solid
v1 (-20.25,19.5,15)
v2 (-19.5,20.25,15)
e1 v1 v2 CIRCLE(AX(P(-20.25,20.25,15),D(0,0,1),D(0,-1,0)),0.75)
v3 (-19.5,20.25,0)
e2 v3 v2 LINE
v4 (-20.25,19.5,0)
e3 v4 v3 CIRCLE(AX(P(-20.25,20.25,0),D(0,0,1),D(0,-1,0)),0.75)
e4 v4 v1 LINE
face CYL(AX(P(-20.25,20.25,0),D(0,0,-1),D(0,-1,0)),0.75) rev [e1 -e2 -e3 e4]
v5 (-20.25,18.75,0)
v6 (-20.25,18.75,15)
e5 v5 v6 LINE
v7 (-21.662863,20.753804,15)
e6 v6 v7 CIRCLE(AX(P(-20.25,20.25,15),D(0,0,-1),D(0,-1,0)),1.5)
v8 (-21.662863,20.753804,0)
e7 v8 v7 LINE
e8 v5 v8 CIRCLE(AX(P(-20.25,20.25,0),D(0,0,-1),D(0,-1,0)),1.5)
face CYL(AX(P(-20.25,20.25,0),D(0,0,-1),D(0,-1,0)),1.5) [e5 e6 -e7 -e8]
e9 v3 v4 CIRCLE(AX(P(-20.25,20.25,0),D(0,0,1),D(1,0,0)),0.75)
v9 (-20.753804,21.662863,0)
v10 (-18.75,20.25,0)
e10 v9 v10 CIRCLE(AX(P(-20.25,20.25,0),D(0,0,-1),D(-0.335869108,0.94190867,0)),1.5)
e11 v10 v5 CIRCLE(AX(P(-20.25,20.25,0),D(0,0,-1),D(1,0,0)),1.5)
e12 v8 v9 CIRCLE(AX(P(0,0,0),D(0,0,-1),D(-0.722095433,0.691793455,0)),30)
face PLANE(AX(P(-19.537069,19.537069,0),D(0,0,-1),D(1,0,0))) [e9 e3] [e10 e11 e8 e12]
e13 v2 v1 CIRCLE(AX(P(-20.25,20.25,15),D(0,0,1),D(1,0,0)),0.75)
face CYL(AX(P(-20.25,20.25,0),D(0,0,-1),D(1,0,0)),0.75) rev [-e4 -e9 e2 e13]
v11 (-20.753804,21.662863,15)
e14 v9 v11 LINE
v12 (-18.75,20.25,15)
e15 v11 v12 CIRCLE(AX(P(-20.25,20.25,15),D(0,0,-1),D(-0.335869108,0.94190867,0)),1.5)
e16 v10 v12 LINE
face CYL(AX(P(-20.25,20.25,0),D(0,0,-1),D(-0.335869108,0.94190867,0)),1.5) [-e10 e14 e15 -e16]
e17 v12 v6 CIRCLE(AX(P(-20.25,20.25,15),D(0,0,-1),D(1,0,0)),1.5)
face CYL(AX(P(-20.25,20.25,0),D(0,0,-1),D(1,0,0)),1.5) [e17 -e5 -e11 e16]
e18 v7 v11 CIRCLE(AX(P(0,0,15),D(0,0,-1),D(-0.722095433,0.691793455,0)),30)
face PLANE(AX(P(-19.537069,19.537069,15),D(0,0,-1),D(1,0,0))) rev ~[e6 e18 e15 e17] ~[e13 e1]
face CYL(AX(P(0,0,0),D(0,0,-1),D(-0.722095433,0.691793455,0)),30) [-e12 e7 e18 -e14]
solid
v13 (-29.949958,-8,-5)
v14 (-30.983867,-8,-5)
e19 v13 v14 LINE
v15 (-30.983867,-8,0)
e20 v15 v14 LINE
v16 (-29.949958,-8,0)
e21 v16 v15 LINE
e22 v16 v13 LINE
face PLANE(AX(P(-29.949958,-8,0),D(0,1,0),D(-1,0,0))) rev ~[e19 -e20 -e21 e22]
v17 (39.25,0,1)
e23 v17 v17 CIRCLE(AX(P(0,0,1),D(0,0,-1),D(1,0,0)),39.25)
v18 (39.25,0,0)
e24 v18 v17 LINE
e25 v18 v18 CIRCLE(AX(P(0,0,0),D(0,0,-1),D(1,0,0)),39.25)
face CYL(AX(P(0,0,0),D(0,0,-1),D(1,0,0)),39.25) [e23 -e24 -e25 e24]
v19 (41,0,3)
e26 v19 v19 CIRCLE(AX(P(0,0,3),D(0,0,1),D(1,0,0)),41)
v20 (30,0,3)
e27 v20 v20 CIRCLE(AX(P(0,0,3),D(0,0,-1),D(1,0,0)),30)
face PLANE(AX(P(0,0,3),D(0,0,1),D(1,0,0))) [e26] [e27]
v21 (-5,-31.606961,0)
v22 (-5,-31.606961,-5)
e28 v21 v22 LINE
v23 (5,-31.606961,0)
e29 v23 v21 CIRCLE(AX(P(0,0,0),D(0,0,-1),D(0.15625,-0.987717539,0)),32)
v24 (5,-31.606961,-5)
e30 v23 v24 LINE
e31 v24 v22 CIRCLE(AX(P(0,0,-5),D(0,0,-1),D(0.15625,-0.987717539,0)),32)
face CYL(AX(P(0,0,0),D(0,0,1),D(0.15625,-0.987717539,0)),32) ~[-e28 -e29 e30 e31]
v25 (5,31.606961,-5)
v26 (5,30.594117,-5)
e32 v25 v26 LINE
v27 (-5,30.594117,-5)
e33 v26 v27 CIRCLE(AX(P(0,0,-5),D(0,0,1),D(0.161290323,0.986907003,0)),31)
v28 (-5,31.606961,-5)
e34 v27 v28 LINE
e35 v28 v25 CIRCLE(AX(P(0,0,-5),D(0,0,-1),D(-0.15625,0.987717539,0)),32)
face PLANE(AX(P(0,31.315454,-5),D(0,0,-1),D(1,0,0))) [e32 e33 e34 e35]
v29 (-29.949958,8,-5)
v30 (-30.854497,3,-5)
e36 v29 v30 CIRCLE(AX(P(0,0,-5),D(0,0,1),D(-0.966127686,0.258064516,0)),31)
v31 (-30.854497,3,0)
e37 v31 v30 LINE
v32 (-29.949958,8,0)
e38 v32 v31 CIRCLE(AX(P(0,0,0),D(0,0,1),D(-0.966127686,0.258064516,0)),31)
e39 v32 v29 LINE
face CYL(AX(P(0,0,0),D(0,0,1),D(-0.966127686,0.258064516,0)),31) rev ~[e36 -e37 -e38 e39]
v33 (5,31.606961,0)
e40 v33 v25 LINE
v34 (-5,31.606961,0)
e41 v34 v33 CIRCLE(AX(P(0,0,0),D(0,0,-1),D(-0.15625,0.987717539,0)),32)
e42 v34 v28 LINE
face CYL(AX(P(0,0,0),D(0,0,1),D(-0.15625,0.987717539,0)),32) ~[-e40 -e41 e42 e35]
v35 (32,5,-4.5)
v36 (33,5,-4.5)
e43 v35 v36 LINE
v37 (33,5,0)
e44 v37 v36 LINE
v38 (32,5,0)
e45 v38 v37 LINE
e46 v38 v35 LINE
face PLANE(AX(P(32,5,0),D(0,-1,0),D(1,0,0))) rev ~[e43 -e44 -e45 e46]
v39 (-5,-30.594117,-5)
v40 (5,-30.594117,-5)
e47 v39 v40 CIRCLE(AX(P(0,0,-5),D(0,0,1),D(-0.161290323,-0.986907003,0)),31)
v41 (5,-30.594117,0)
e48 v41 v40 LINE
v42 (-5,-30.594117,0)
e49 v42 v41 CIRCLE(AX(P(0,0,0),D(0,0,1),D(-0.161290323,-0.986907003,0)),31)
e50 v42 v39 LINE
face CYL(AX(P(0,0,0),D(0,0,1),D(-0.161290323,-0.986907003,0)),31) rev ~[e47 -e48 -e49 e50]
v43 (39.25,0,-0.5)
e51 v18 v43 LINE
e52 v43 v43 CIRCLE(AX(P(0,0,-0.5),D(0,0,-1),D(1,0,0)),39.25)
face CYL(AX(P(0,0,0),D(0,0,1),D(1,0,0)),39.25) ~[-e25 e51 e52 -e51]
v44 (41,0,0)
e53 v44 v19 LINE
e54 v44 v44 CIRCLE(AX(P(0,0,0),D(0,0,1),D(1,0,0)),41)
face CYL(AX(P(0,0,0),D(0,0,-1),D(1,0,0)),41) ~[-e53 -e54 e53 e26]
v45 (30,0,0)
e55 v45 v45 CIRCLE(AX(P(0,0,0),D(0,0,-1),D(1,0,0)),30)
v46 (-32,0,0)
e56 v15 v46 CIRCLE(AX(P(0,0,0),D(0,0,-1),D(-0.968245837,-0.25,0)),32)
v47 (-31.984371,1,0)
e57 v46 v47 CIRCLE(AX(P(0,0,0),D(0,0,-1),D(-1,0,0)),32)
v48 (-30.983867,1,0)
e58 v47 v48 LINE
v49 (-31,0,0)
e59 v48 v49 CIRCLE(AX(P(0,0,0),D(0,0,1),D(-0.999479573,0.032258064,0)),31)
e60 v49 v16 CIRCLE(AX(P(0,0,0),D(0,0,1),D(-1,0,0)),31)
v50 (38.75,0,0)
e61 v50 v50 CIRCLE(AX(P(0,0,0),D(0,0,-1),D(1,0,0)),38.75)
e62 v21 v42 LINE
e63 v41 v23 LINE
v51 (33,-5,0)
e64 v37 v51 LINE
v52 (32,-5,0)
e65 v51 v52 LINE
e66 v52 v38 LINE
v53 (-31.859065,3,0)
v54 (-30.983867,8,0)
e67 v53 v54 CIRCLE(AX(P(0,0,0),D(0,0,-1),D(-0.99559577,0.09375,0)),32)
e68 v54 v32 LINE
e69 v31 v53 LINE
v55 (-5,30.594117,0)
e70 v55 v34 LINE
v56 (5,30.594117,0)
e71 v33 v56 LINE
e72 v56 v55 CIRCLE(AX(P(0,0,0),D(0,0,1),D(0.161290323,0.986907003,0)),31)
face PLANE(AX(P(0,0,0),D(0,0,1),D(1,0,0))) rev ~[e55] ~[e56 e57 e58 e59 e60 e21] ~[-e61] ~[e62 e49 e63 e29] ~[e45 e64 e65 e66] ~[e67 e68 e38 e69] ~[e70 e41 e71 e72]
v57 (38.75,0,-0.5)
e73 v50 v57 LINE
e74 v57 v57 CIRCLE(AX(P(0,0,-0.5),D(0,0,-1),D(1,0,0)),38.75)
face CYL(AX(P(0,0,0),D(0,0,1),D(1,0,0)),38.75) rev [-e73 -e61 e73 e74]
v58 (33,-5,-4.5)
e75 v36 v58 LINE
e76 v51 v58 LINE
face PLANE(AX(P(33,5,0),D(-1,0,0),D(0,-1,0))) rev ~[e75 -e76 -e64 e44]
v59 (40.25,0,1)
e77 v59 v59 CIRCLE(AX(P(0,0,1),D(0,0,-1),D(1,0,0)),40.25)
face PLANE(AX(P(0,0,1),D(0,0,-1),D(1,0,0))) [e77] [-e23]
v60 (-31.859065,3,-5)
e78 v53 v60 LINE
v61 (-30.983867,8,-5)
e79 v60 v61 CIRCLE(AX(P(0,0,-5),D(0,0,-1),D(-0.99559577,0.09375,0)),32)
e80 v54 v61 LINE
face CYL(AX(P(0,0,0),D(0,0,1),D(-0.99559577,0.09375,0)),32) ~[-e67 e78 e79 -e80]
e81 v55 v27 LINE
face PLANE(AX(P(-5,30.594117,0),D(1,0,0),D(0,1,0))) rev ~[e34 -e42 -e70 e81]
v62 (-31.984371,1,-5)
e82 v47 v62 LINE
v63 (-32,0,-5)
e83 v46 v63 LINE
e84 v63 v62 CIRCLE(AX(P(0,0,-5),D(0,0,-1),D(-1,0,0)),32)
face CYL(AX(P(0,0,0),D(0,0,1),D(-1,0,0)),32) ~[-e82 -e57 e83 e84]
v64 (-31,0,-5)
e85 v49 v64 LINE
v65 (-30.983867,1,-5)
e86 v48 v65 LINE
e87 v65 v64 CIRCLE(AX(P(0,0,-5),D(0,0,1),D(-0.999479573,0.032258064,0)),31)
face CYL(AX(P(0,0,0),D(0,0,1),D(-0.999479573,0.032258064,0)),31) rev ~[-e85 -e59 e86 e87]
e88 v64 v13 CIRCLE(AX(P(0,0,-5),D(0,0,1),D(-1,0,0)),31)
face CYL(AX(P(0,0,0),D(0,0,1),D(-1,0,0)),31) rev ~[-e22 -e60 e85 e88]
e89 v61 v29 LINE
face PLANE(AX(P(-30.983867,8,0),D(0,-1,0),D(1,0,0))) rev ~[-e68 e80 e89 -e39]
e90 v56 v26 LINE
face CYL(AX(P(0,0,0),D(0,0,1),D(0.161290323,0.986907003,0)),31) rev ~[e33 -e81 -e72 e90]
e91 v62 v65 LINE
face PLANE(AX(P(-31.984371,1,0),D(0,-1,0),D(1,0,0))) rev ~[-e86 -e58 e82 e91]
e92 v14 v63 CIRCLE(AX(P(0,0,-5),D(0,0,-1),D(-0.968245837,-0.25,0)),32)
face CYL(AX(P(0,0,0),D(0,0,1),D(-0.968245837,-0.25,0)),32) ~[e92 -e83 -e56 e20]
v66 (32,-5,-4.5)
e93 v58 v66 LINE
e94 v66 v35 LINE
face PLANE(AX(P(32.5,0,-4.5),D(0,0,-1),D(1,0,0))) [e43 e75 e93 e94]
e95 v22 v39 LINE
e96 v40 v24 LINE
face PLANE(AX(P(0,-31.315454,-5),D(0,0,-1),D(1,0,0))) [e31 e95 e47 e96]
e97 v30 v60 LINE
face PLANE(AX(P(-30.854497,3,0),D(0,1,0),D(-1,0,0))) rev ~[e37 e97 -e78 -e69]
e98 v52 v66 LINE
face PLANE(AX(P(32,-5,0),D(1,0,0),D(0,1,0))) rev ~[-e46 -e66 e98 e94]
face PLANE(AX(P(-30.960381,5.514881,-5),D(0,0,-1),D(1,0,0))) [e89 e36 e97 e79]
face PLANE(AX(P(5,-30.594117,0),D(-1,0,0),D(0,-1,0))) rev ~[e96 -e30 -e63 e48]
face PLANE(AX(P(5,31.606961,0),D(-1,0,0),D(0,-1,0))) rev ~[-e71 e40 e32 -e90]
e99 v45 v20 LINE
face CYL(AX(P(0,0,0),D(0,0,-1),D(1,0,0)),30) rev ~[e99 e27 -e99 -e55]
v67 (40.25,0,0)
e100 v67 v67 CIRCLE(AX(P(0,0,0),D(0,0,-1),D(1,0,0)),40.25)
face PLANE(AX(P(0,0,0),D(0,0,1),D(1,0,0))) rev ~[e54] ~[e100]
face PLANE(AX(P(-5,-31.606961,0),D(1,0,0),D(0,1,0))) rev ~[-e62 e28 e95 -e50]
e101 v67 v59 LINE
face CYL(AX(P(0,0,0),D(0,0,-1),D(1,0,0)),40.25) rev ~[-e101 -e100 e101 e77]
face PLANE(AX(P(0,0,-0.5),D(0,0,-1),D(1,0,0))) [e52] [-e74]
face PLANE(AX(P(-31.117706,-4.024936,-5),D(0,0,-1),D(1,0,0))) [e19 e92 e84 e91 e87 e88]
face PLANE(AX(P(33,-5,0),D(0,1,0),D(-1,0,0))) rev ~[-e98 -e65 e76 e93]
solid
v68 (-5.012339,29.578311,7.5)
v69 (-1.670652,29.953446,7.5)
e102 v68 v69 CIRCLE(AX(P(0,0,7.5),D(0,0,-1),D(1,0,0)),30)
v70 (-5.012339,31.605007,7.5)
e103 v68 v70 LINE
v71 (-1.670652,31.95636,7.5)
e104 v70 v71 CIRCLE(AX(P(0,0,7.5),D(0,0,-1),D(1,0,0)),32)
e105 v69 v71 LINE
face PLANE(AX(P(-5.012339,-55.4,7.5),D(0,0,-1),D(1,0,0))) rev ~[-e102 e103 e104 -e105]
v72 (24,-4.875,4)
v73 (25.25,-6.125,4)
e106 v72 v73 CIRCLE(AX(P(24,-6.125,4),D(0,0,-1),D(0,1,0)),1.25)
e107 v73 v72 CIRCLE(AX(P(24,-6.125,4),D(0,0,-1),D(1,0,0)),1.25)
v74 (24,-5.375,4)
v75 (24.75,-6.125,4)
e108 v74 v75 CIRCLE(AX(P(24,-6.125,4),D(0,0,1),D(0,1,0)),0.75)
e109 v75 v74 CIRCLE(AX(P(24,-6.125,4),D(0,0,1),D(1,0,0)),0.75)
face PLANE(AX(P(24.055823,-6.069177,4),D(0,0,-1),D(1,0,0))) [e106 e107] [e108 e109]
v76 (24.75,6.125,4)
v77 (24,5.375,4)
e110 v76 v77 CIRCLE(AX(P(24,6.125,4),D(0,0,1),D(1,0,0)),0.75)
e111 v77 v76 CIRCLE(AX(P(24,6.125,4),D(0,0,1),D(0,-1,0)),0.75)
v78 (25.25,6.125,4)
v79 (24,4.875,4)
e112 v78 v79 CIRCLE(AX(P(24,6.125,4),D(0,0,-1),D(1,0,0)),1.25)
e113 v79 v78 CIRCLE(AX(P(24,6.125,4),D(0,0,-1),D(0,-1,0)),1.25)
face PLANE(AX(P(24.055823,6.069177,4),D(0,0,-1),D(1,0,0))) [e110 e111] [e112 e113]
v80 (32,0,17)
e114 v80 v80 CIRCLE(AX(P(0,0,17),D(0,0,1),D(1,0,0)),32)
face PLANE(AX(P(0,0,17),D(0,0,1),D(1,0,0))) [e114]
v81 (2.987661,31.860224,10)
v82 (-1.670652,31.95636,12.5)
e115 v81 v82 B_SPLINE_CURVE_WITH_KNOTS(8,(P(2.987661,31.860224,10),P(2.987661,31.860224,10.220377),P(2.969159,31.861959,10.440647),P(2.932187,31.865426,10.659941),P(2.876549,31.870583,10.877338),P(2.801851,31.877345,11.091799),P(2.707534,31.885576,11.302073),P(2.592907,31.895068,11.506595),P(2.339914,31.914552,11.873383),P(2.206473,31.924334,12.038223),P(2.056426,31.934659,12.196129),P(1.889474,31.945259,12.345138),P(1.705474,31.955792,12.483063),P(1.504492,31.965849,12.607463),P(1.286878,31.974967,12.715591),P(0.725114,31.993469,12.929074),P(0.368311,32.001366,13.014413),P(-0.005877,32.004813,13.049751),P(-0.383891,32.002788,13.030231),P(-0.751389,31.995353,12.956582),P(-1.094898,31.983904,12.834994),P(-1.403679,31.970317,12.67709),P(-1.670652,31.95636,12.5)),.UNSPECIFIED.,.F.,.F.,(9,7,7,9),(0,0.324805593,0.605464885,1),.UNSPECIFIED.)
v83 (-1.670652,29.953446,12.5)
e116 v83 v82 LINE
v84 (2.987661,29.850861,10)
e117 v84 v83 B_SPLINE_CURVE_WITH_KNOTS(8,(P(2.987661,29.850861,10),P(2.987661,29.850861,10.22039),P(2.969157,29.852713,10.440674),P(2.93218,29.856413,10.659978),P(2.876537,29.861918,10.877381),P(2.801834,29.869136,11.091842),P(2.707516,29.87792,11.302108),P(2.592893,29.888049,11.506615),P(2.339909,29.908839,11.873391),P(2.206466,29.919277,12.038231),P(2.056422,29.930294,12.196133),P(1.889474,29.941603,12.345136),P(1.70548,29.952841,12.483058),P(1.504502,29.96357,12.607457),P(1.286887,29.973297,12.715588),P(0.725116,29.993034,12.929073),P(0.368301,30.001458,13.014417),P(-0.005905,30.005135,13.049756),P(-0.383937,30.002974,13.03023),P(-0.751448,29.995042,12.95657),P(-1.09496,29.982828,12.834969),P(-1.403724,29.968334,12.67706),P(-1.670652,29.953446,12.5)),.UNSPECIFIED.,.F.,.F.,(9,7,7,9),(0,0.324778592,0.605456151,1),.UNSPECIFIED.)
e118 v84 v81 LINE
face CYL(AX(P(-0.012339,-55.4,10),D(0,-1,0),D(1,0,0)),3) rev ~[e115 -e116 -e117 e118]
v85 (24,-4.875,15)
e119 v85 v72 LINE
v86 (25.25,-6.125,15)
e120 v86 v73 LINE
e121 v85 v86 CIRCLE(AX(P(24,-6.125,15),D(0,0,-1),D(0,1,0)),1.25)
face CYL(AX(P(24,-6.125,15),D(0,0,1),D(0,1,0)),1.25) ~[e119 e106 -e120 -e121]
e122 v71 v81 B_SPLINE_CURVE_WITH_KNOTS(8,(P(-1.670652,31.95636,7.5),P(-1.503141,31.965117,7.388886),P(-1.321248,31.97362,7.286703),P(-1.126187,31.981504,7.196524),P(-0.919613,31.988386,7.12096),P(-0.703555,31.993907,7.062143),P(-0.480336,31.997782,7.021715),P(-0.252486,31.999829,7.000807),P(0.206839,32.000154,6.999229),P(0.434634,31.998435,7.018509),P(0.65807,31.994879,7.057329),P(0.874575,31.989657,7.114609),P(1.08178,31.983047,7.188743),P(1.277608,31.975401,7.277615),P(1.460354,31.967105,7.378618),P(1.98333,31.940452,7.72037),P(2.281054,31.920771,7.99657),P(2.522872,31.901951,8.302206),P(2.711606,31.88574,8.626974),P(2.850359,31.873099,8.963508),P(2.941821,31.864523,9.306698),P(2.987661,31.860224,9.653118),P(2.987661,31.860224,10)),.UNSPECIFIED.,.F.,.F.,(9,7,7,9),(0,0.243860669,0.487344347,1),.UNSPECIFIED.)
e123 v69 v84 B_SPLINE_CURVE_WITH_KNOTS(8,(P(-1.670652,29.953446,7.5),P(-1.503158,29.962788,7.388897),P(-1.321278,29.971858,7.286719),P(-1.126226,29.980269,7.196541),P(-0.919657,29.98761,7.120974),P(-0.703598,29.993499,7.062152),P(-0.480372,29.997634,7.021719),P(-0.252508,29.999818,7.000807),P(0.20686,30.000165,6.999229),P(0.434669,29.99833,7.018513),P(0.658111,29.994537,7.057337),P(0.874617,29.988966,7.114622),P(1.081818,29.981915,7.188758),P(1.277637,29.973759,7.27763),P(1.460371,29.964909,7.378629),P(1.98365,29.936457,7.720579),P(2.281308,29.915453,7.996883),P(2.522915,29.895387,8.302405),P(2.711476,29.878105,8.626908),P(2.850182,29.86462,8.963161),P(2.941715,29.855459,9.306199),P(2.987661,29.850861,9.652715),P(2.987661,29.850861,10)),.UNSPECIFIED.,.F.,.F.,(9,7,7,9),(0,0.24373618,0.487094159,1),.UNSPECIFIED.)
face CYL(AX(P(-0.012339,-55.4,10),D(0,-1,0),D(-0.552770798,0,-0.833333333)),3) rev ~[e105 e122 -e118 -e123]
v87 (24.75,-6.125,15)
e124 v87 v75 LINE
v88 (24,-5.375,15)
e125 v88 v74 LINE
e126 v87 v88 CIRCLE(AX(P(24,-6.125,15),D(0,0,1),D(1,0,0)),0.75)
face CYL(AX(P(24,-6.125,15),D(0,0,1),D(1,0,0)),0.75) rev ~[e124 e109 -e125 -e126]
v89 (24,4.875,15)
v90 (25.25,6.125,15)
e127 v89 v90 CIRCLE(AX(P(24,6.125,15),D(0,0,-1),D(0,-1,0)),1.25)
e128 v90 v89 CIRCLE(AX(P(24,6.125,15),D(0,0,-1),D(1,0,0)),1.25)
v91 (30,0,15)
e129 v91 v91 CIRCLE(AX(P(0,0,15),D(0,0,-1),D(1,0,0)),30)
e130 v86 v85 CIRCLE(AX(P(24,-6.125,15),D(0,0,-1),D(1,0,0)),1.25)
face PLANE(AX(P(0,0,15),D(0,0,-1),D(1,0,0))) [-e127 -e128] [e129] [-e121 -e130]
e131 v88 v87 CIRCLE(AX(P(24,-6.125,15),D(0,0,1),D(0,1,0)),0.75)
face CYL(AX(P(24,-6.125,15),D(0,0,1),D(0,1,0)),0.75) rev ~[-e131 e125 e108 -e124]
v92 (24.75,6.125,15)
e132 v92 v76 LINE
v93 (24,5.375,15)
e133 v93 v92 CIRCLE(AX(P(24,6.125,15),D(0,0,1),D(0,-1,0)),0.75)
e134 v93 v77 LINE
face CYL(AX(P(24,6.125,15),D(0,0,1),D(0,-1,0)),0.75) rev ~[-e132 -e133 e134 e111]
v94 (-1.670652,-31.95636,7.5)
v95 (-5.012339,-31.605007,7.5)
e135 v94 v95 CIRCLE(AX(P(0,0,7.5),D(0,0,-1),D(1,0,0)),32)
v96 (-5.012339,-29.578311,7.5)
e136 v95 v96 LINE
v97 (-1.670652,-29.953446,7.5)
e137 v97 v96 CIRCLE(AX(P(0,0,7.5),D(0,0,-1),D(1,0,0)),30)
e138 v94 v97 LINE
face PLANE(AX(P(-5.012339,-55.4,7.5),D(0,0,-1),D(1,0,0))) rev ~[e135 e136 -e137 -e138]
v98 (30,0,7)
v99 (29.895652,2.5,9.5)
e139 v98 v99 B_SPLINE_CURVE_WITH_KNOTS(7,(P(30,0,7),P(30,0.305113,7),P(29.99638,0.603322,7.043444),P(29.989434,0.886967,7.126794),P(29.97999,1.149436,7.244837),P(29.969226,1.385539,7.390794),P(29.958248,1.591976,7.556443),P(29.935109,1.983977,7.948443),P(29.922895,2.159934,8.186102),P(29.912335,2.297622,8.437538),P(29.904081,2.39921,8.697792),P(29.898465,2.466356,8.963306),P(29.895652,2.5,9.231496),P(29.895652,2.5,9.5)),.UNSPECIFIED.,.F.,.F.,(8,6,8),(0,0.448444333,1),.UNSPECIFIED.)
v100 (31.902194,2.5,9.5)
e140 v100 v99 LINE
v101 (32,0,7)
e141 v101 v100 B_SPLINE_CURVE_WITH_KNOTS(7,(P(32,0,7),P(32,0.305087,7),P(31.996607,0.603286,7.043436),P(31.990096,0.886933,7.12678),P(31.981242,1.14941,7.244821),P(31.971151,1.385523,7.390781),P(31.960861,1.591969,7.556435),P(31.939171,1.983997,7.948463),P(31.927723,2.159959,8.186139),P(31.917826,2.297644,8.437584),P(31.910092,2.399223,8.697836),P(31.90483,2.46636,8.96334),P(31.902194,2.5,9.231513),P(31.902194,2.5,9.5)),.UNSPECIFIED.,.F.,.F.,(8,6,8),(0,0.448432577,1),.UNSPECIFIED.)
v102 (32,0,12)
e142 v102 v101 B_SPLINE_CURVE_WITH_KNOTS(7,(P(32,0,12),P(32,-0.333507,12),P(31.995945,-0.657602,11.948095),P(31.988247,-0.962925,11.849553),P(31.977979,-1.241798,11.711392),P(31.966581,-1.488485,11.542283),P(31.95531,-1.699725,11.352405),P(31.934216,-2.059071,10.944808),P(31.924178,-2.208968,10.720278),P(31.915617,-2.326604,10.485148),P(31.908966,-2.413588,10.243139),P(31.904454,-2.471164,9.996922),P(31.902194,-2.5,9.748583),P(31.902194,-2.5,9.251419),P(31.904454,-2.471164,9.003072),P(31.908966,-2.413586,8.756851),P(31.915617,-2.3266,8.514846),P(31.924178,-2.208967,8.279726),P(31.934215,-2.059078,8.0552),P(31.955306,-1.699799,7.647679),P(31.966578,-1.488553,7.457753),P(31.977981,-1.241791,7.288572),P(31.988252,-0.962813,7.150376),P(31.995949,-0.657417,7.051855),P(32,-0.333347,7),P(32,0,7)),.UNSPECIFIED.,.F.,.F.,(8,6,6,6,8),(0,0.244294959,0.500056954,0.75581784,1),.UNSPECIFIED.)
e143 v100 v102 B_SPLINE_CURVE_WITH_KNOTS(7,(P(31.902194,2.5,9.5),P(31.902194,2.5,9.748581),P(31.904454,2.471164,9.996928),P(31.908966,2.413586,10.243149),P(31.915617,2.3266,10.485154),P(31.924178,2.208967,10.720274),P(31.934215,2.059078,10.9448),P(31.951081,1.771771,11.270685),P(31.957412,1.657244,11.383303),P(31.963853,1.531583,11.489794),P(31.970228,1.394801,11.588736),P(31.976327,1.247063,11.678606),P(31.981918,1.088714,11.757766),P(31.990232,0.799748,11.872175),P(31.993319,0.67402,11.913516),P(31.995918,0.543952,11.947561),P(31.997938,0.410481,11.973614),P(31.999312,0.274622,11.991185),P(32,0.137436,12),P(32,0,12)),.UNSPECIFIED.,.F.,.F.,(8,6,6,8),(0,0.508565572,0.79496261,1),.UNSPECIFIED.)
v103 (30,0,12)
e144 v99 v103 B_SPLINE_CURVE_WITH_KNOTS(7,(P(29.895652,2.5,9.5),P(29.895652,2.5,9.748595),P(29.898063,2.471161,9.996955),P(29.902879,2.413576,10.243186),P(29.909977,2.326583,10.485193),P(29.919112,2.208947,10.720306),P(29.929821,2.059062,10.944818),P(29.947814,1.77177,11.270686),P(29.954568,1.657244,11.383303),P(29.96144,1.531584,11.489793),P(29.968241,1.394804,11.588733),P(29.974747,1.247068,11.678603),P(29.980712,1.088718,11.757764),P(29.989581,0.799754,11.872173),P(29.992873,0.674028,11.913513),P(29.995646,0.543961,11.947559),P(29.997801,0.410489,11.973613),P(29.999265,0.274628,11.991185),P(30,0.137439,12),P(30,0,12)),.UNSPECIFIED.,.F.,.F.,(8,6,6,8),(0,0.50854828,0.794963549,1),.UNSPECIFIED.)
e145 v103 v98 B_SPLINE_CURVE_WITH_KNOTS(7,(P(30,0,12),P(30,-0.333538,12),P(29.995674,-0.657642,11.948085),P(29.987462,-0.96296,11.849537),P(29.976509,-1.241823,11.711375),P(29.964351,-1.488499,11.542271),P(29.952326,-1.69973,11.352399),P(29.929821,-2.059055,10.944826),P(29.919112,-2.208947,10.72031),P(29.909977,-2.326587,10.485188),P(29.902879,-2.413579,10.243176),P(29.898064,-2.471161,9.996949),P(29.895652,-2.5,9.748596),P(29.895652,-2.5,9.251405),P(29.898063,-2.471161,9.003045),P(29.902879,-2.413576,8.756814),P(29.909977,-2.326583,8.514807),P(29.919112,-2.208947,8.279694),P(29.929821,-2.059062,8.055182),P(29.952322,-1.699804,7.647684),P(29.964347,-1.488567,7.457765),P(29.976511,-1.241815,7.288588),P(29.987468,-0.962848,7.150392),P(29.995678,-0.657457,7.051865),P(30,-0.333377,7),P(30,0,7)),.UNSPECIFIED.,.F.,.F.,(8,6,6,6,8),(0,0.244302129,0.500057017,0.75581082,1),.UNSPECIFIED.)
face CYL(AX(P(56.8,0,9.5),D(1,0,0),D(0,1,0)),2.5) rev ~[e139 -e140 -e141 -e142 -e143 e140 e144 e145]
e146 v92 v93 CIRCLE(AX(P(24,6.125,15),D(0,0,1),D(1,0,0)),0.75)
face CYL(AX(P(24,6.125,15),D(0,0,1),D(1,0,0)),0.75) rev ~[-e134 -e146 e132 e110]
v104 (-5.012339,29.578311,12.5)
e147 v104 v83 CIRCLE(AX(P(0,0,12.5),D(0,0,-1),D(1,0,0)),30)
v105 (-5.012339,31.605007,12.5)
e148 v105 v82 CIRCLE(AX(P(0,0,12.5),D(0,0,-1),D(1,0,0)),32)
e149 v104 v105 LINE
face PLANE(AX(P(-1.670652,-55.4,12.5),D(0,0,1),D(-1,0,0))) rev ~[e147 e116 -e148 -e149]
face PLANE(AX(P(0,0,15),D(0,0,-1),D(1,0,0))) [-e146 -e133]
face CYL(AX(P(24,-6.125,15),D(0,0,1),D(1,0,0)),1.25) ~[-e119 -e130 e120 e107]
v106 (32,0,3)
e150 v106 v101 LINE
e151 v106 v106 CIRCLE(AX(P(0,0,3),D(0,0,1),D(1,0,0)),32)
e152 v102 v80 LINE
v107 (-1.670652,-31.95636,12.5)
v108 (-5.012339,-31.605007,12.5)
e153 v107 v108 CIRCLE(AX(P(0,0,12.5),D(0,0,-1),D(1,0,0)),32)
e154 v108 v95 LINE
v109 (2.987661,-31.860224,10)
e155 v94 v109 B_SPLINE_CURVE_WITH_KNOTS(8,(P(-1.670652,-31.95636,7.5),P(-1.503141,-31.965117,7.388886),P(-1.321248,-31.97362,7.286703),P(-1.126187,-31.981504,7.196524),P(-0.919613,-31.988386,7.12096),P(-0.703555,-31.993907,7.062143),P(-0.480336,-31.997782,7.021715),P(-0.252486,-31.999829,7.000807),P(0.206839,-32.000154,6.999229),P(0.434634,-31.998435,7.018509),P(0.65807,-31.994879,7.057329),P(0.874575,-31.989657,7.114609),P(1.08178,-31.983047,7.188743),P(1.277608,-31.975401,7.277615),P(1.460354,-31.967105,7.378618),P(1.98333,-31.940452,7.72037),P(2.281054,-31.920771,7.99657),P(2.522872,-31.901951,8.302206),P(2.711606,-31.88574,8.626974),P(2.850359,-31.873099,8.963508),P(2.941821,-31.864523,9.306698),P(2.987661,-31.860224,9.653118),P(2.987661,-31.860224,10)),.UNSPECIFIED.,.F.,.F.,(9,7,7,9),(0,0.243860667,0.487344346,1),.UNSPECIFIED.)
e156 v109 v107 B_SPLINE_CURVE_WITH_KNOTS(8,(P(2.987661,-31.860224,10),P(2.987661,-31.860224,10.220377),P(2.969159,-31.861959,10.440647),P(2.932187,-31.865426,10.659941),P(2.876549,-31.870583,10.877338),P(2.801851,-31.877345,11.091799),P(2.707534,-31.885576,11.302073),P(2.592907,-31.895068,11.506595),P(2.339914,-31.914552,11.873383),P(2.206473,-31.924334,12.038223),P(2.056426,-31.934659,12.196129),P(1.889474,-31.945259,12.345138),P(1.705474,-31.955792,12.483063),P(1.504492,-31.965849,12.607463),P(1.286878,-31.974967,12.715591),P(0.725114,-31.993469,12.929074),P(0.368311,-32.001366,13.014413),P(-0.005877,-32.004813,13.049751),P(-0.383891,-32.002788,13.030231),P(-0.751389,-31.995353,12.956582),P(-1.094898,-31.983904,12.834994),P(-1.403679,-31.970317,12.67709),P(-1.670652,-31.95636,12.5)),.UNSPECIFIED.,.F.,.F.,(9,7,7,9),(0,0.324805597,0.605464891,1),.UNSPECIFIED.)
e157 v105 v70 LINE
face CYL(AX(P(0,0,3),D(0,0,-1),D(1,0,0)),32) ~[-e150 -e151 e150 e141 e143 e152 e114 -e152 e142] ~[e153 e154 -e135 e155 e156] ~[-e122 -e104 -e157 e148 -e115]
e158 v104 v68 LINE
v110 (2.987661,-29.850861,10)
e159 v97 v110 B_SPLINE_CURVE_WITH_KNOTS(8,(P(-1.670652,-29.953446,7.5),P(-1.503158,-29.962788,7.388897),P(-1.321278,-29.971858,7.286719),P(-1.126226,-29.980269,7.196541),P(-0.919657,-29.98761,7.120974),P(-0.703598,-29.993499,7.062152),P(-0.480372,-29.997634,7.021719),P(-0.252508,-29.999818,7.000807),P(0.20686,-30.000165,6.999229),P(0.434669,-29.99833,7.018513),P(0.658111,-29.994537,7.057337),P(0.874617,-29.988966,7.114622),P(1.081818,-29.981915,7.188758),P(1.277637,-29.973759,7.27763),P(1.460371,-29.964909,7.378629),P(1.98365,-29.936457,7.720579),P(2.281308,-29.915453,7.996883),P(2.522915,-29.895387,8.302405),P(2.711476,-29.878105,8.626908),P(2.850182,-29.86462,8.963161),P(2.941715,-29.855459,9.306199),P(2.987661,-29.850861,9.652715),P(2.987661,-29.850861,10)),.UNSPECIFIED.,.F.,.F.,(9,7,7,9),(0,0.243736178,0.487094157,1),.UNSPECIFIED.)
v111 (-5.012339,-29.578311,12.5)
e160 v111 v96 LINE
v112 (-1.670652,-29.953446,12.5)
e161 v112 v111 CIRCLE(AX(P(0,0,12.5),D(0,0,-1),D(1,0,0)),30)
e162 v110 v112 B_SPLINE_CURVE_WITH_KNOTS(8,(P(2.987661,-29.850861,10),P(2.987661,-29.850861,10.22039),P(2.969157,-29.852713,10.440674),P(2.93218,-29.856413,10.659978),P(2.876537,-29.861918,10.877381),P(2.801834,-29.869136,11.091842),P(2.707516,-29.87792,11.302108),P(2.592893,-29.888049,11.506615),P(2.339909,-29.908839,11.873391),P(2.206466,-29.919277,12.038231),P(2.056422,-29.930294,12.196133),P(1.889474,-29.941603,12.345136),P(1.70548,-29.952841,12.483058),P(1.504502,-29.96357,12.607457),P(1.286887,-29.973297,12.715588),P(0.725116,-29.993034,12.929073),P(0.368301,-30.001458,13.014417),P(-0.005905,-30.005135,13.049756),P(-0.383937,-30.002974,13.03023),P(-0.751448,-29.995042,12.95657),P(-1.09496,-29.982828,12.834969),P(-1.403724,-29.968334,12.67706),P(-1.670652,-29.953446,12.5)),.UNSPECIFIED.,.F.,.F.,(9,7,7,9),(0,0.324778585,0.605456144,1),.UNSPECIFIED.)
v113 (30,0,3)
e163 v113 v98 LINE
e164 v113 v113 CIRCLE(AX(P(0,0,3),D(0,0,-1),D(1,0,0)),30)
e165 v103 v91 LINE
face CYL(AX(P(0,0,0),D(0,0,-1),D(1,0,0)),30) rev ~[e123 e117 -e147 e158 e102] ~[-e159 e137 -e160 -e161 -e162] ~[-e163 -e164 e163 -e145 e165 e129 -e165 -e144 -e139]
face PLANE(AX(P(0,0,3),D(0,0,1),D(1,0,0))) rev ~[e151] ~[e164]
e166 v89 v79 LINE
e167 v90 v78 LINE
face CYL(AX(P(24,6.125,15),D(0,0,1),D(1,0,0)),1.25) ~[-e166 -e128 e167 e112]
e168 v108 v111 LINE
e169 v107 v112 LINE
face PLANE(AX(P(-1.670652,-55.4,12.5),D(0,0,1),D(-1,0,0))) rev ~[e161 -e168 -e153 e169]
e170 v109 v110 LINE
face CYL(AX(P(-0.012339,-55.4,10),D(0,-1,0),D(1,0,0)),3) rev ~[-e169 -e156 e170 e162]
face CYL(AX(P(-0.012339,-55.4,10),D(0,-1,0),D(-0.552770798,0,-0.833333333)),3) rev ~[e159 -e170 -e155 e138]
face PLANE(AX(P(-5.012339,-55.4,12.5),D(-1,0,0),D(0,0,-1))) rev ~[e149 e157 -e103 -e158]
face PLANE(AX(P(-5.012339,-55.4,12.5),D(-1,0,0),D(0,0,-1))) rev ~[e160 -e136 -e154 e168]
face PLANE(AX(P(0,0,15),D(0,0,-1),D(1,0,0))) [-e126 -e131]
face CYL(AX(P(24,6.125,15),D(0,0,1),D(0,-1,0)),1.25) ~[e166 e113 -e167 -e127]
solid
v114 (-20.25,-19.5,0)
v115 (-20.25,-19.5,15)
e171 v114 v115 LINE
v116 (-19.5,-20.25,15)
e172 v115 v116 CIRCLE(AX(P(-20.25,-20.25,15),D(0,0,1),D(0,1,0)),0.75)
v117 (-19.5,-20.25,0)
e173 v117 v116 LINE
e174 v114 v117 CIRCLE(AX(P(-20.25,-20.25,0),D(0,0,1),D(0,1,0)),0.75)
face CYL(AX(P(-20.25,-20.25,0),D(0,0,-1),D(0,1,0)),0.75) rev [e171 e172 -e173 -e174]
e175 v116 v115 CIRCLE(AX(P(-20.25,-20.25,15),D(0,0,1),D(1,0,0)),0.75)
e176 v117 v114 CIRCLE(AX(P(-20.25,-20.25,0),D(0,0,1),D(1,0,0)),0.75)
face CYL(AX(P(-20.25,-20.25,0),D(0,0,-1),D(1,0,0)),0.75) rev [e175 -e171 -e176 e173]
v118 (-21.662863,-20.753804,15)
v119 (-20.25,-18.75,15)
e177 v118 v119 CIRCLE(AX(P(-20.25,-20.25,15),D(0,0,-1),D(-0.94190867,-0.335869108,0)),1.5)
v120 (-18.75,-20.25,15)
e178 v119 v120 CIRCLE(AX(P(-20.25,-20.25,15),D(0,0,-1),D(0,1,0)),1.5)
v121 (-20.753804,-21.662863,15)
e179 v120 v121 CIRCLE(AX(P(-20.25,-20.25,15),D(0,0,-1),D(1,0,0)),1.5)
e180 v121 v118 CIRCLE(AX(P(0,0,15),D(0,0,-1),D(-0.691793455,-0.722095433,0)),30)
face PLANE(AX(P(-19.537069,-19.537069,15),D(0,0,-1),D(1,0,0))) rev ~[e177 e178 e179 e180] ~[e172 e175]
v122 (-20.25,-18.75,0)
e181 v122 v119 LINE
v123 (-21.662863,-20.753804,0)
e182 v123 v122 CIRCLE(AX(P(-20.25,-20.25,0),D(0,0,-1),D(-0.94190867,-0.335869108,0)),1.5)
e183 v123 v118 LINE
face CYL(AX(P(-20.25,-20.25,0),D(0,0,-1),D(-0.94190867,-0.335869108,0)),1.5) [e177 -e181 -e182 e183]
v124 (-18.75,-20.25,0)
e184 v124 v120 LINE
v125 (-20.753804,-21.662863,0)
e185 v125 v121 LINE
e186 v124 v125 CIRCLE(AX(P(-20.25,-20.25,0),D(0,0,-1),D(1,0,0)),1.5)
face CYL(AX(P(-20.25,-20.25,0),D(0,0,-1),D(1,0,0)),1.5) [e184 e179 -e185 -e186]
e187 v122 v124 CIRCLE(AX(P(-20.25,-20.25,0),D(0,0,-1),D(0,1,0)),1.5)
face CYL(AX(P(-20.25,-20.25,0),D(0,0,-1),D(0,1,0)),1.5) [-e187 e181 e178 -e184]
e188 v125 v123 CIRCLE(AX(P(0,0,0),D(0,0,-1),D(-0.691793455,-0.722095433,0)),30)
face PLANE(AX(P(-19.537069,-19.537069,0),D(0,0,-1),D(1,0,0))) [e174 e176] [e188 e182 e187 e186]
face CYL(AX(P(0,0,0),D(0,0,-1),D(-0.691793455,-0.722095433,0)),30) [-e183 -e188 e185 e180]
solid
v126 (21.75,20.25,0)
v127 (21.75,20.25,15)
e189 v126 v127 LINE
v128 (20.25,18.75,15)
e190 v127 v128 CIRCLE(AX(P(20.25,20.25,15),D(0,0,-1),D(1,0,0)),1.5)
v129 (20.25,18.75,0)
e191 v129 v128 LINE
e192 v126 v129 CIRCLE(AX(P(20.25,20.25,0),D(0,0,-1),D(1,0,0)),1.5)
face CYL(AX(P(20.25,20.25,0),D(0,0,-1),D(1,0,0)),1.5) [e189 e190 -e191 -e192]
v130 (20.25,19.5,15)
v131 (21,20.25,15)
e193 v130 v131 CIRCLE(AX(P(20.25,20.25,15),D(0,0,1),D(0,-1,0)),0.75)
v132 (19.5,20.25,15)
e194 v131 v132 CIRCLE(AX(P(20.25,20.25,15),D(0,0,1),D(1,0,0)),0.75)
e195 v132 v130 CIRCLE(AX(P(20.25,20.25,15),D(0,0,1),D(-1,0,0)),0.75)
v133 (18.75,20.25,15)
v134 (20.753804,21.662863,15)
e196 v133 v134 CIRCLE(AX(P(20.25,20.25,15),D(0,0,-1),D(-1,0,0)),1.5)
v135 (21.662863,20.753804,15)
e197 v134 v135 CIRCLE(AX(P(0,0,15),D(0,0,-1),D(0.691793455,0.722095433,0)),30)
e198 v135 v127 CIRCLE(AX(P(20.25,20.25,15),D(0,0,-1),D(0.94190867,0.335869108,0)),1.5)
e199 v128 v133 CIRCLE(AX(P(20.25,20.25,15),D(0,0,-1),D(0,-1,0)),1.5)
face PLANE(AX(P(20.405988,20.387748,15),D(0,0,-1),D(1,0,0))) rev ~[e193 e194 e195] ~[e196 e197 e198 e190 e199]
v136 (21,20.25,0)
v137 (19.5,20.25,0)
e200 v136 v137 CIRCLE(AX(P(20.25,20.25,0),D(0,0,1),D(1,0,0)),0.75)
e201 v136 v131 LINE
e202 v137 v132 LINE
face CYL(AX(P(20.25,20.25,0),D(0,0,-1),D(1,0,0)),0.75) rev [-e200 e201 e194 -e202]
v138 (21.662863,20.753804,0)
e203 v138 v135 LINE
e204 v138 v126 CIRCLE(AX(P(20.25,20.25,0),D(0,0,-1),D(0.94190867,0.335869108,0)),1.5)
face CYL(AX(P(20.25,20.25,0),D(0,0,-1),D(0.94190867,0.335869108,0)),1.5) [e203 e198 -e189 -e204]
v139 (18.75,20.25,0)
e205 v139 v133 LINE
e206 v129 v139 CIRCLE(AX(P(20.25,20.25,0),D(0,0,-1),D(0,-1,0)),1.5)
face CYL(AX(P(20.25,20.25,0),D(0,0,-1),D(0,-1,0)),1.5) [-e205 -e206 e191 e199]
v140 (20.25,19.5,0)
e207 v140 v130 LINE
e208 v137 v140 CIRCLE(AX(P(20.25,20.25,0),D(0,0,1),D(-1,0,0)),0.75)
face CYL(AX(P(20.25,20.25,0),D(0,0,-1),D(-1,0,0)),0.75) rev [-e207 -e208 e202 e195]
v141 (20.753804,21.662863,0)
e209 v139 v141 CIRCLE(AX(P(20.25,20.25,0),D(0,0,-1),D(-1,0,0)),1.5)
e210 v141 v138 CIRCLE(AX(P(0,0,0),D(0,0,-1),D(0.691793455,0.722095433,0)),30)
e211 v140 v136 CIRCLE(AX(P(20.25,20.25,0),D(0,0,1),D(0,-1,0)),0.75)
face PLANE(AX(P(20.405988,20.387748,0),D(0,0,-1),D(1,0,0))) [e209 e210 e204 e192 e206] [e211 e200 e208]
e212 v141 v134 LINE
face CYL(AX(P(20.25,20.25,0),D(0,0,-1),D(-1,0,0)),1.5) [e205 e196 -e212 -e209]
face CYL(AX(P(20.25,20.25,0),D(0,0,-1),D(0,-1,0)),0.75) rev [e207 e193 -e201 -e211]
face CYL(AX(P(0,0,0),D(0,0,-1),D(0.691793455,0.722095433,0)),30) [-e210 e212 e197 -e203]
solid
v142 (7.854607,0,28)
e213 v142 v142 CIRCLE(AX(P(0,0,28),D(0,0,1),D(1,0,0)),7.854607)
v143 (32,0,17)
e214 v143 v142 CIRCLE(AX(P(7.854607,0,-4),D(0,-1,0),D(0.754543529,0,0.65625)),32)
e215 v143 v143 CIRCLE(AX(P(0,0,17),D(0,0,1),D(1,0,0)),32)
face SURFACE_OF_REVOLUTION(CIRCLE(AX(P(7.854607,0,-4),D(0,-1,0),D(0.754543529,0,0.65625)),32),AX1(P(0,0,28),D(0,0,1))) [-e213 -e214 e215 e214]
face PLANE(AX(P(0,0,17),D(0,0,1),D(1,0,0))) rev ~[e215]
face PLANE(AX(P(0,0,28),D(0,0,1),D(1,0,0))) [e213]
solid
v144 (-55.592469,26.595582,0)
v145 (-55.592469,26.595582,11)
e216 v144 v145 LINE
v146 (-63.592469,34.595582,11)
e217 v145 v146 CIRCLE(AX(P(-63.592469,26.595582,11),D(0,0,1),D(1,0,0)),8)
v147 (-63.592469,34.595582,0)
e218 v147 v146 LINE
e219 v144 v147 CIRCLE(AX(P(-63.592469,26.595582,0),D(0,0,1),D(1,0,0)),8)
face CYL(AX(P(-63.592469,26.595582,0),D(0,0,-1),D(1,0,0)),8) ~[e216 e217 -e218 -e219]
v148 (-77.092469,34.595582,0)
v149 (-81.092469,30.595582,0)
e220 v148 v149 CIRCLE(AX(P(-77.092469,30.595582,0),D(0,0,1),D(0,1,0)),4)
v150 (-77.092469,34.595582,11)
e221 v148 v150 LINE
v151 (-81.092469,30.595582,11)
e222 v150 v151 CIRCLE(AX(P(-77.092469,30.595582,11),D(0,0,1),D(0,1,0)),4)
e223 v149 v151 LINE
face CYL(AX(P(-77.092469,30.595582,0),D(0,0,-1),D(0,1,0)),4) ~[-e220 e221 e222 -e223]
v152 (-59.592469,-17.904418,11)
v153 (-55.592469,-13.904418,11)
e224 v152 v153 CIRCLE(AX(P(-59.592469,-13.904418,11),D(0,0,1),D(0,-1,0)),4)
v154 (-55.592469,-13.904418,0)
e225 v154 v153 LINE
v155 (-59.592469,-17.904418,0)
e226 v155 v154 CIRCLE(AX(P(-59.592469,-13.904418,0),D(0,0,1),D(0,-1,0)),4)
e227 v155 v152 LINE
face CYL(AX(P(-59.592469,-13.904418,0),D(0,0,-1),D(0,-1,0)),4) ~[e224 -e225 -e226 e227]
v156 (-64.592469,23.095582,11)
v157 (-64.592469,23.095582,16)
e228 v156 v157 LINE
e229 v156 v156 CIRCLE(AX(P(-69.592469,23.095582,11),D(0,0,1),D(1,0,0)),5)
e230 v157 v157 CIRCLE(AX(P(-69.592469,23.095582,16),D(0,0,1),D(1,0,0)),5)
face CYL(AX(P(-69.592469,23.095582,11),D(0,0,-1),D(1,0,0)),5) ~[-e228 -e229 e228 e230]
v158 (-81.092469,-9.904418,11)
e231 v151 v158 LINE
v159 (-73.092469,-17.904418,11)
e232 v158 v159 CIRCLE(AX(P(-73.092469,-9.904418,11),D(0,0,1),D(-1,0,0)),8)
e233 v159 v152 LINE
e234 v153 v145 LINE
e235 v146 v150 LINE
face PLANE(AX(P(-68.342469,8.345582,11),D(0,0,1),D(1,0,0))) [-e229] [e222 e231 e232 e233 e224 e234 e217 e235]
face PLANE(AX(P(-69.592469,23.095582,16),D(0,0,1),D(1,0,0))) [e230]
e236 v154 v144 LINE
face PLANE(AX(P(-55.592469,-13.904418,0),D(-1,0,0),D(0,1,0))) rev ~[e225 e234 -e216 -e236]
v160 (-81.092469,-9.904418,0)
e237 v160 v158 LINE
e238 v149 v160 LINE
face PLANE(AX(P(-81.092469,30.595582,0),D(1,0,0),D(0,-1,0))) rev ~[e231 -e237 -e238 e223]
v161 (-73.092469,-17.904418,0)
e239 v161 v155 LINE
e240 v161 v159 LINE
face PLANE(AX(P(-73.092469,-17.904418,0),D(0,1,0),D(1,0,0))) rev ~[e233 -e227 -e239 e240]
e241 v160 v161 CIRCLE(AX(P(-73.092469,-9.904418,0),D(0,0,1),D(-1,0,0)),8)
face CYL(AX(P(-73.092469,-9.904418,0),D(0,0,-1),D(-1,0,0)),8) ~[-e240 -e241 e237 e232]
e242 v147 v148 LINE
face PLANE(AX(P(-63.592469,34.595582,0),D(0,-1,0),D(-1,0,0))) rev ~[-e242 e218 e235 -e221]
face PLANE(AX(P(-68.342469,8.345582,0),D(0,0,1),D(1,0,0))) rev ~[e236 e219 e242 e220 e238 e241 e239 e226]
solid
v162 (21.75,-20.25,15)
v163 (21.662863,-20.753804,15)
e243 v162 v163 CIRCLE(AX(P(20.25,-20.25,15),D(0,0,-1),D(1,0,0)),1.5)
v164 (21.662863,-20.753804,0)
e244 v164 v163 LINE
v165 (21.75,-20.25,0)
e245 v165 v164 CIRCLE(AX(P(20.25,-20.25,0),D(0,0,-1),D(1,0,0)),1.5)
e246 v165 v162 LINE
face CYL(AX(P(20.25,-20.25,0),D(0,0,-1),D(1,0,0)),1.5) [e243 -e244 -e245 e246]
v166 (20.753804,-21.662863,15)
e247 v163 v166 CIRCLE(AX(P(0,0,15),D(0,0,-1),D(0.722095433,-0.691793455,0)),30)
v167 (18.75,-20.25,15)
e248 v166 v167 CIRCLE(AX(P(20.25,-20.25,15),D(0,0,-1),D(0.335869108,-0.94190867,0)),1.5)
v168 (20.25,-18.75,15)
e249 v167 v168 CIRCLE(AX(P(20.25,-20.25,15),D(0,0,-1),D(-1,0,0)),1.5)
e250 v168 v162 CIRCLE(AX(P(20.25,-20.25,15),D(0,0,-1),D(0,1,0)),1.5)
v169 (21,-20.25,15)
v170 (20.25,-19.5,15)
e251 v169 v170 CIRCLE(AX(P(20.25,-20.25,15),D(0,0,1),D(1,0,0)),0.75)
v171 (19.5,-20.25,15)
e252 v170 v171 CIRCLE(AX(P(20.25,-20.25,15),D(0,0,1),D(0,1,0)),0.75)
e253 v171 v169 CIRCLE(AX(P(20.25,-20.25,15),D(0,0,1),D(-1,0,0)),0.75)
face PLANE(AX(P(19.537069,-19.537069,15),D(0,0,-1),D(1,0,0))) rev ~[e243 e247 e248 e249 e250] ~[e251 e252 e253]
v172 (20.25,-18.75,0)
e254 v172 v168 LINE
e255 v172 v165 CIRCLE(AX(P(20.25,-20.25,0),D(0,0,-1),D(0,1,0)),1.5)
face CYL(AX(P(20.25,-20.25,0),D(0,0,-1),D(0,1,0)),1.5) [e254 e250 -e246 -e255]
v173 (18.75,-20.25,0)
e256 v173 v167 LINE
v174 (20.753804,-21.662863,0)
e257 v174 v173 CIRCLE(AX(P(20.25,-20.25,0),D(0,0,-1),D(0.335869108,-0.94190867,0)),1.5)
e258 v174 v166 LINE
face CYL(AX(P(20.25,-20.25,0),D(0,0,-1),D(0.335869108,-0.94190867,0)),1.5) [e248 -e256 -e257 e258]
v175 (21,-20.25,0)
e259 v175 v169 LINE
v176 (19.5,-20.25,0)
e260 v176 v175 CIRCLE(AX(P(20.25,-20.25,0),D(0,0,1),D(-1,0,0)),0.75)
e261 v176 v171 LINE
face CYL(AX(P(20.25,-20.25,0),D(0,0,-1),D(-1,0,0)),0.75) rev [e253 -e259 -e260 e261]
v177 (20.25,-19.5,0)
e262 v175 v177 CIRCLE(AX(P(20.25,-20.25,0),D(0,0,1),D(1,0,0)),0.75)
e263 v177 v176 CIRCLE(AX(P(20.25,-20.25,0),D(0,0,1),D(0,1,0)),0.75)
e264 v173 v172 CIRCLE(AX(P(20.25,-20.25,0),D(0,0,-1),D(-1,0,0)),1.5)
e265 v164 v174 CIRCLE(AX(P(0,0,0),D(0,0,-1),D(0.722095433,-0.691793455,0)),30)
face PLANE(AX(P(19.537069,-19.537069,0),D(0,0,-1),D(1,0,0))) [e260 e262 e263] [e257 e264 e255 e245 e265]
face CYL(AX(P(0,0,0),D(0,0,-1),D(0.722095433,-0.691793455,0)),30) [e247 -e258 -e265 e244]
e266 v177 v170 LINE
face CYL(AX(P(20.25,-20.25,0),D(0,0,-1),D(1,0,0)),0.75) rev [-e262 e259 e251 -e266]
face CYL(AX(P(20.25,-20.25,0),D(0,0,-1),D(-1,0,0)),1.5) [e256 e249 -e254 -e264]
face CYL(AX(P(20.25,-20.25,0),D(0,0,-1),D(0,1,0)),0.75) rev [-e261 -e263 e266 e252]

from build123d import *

# Parameters (mm, degrees)
F0_R      = 41
F1_DEPTH  = 3
F2_R      = 32
F3_DEPTH  = 14
F4_R      = 32
F5_DEPTH  = 11
F9_DEPTH  = 120.3
F11_R     = 2.5
F12_DEPTH = 58.4
F13_R     = 40.25
F13_R_2   = 39.25
F14_DEPTH = 1
F15_R     = 39.25
F15_R_2   = 38.75
F16_DEPTH = 0.5
F17_R     = 30
F18_DEPTH = 15
F20_DEPTH = 4.5
F22_DEPTH = 11
F24_DEPTH = 15
F26_DEPTH = 5
F28_DEPTH = 11
F29_R     = 5
F30_DEPTH = 5


# Not quite as in the source:
# - a fillet or chamfer that OpenCascade refuses, or shapes differently, is made with other operations: its cross-section is extruded or revolved along the edge and cut away or added


with BuildPart() as f1:
    # F0 (on Top) → F1 (new body)
    with BuildSketch(Plane.XY):
        Circle(F0_R)
    extrude(amount=F1_DEPTH)

    # F13 (on face) → F14 (cut)
    with BuildSketch(Plane(origin=(0, 0, 0), x_dir=(1, 0, 0), z_dir=(0, 0, -1))):
        Circle(F13_R)
        Circle(F13_R_2, mode=Mode.SUBTRACT)
    extrude(amount=-F14_DEPTH, mode=Mode.SUBTRACT)

    # F15 (on face) → F16 (join)
    with BuildSketch(Plane(origin=(0, 0, 0), x_dir=(1, 0, 0), z_dir=(0, 0, -1))):
        Circle(F15_R)
        Circle(F15_R_2, mode=Mode.SUBTRACT)
    extrude(amount=F16_DEPTH)


with BuildPart() as f3:
    # F2 (on face) → F3 (new body)
    with BuildSketch(Plane.XY.offset(3)):
        Circle(F2_R)
    extrude(amount=F3_DEPTH)

    # F8 (on offset) → F9 (cut)
    with BuildSketch(Plane.XZ.offset(55.4)):
        with BuildLine():
            ThreePointArc((-1.6706518419, 7.5), (1.4062977188, 7.3566179631), (2.9876605533, 10))
            ThreePointArc((2.9876605533, 10), (1.4062977188, 12.6433820369), (-1.6706518419, 12.5))
            ThreePointArc((-1.6706518419, 12.5), (-3.0123394467, 10), (-1.6706518419, 7.5))
        make_face()
        with BuildLine():
            ThreePointArc((-1.6706518419, 7.5), (-3.0123394467, 10), (-1.6706518419, 12.5))
            Line((-1.6706518419, 12.5), (-5.0123394467, 12.5))
            Line((-5.0123394467, 12.5), (-5.0123394467, 10))
            Line((-5.0123394467, 10), (-5.0123394467, 7.5))
            Line((-5.0123394467, 7.5), (-1.6706518419, 7.5))
        make_face()
    extrude(amount=-F9_DEPTH, mode=Mode.SUBTRACT)

    # F11 (on offset) → F12 (cut)
    with BuildSketch(Plane.YZ.offset(56.8)):
        with Locations((0, 9.5)):
            Circle(F11_R)
    extrude(amount=-F12_DEPTH, mode=Mode.SUBTRACT)


with BuildPart() as f5:
    # F4 (on face) → F5 (new body)
    with BuildSketch(Plane.XY.offset(17)):
        Circle(F4_R)
    extrude(amount=F5_DEPTH)

    # F6: fillet of radius 32 on 1 edges, made by hand

    # F6_s1 → F6_t2 (revolve, cut)
    with BuildSketch(Plane.XZ):
        with BuildLine():
            ThreePointArc((32, 17), (21.1211062261, 25.1204395571), (7.8546070647, 28))
            Line((7.8546070647, 28), (32, 28))
            Line((32, 28), (32, 17))
        make_face()
    revolve(axis=Axis((0, 0, 28), (0, 0, 1)), mode=Mode.SUBTRACT)


with BuildPart() as f18_tool:
    # F17 (on face) → F18 (new body)
    with BuildSketch(Plane(origin=(0, 0, 0), x_dir=(1, 0, 0), z_dir=(0, 0, -1))):
        Circle(F17_R)
    extrude(amount=-F18_DEPTH)


with BuildPart() as f1_1:
    add(f1.part)

    # F18: cut by f18_tool
    add(f18_tool.part, mode=Mode.SUBTRACT)

    # F19 (on face) → F20 (join)
    with BuildSketch(Plane(origin=(0, 0, 0), x_dir=(1, 0, 0), z_dir=(0, 0, -1))):
        Polygon((32, 5), (32, 0), (32, -5), (33, -5), (33, 5), align=None)
    extrude(amount=F20_DEPTH)

    # F25 (on face) → F26 (join)
    with BuildSketch(Plane(origin=(0, 0, 0), x_dir=(1, 0, 0), z_dir=(0, 0, -1))):
        with BuildLine():
            Line((5, 30.5941170816), (5, 31.6069612586))
            ThreePointArc((5, 31.6069612586), (0, 32), (-5, 31.6069612586))
            Line((-5, 31.6069612586), (-5, 30.5941170816))
            ThreePointArc((-5, 30.5941170816), (0, 31), (5, 30.5941170816))
        make_face()
        with BuildLine():
            ThreePointArc((-5, -31.6069612586), (0, -32), (5, -31.6069612586))
            Line((5, -31.6069612586), (5, -30.5941170816))
            ThreePointArc((5, -30.5941170816), (0, -31), (-5, -30.5941170816))
            Line((-5, -30.5941170816), (-5, -31.6069612586))
        make_face()
        with BuildLine():
            ThreePointArc((-31.8590646441, -3), (-31.5207631121, -5.5173809756), (-30.9838667697, -8))
            Line((-30.9838667697, -8), (-29.9499582637, -8))
            ThreePointArc((-29.9499582637, -8), (-30.504843096, -5.5185639156), (-30.8544972411, -3))
            Line((-30.8544972411, -3), (-31.8590646441, -3))
        make_face()
        with BuildLine():
            Line((-29.9499582637, 8), (-30.9838667697, 8))
            ThreePointArc((-30.9838667697, 8), (-31.7449502805, 4.0321373594), (-32, 0))
            Line((-32, 0), (-31, 0))
            ThreePointArc((-31, 0), (-30.7363685735, 4.0343087279), (-29.9499582637, 8))
        make_face()
        with BuildLine():
            Line((-31, 0), (-32, 0))
            ThreePointArc((-32, 0), (-31.9960925573, -0.5000610612), (-31.9843711834, -1))
            Line((-31.9843711834, -1), (-30.9838667697, -1))
            ThreePointArc((-30.9838667697, -1), (-30.99596643, -0.500065066), (-31, 0))
        make_face()
    extrude(amount=F26_DEPTH)


with BuildPart() as f3_1:
    add(f3.part)

    # F18: cut by f18_tool
    add(f18_tool.part, mode=Mode.SUBTRACT)

    # F21 (on face) → F22 (join)
    with BuildSketch(Plane(origin=(0, 0, 15), x_dir=(1, 0, 0), z_dir=(0, 0, -1))):
        with BuildLine():
            ThreePointArc((25.25, 6.125), (23.1161165235, 7.0088834765), (24, 4.875))
            ThreePointArc((24, 4.875), (24.8838834765, 5.2411165235), (25.25, 6.125))
        make_face()
        with BuildLine():
            ThreePointArc((24.75, 6.125), (24.5303300859, 5.5946699141), (24, 5.375))
            ThreePointArc((24, 5.375), (23.4696699141, 6.6553300859), (24.75, 6.125))
        make_face(mode=Mode.SUBTRACT)
        with BuildLine():
            ThreePointArc((25.25, -6.125), (24.8838834765, -5.2411165235), (24, -4.875))
            ThreePointArc((24, -4.875), (23.1161165235, -7.0088834765), (25.25, -6.125))
        make_face()
        with BuildLine():
            ThreePointArc((24.75, -6.125), (23.4696699141, -6.6553300859), (24, -5.375))
            ThreePointArc((24, -5.375), (24.5303300859, -5.5946699141), (24.75, -6.125))
        make_face(mode=Mode.SUBTRACT)
    extrude(amount=F22_DEPTH)


with BuildPart() as f24:
    # F23 (on face) → F24 (new body, through all)
    with BuildSketch(Plane(origin=(0, 0, 0), x_dir=(1, 0, 0), z_dir=(0, 0, -1))):
        with BuildLine():
            Line((19.5, 20.25), (18.75, 20.25))
            ThreePointArc((18.75, 20.25), (19.1893398282, 19.1893398282), (20.25, 18.75))
            Line((20.25, 18.75), (20.25, 19.5))
            ThreePointArc((20.25, 19.5), (19.7196699141, 19.7196699141), (19.5, 20.25))
        make_face()
        with BuildLine():
            ThreePointArc((21.6628630048, 20.7538036619), (21.2132034356, 21.2132034356), (20.7538036619, 21.6628630048))
            ThreePointArc((20.7538036619, 21.6628630048), (19.3856231993, 21.475908947), (18.75, 20.25))
            Line((18.75, 20.25), (19.5, 20.25))
            ThreePointArc((19.5, 20.25), (20.25, 21), (21, 20.25))
            ThreePointArc((21, 20.25), (20.7803300859, 19.7196699141), (20.25, 19.5))
            Line((20.25, 19.5), (20.25, 18.75))
            ThreePointArc((20.25, 18.75), (21.3106601718, 19.1893398282), (21.75, 20.25))
            ThreePointArc((21.75, 20.25), (21.7280552268, 20.5056418323), (21.6628630048, 20.7538036619))
        make_face()
    extrude(amount=-F24_DEPTH)


with BuildPart() as f24b:
    # F23 (on face) → F24, piece 2 (new body, through all)
    with BuildSketch(Plane(origin=(0, 0, 0), x_dir=(1, 0, 0), z_dir=(0, 0, -1))):
        with BuildLine():
            Line((19.5, -20.25), (18.75, -20.25))
            ThreePointArc((18.75, -20.25), (19.3856231993, -21.475908947), (20.7538036619, -21.6628630048))
            ThreePointArc((20.7538036619, -21.6628630048), (21.2132034356, -21.2132034356), (21.6628630048, -20.7538036619))
            ThreePointArc((21.6628630048, -20.7538036619), (21.7280552268, -20.5056418323), (21.75, -20.25))
            ThreePointArc((21.75, -20.25), (21.3106601718, -19.1893398282), (20.25, -18.75))
            Line((20.25, -18.75), (20.25, -19.5))
            ThreePointArc((20.25, -19.5), (20.7803300859, -19.7196699141), (21, -20.25))
            ThreePointArc((21, -20.25), (20.25, -21), (19.5, -20.25))
        make_face()
        with BuildLine():
            ThreePointArc((20.25, -18.75), (19.1893398282, -19.1893398282), (18.75, -20.25))
            Line((18.75, -20.25), (19.5, -20.25))
            ThreePointArc((19.5, -20.25), (19.7196699141, -19.7196699141), (20.25, -19.5))
            Line((20.25, -19.5), (20.25, -18.75))
        make_face()
    extrude(amount=-F24_DEPTH)


with BuildPart() as f24c:
    # F23 (on face) → F24, piece 3 (new body, through all)
    with BuildSketch(Plane(origin=(0, 0, 0), x_dir=(1, 0, 0), z_dir=(0, 0, -1))):
        with BuildLine():
            ThreePointArc((-18.75, -20.25), (-19.1893398282, -19.1893398282), (-20.25, -18.75))
            Line((-20.25, -18.75), (-20.25, -19.5))
            ThreePointArc((-20.25, -19.5), (-19.7196699141, -19.7196699141), (-19.5, -20.25))
            Line((-19.5, -20.25), (-18.75, -20.25))
        make_face()
        with BuildLine():
            Line((-20.25, -19.5), (-20.25, -18.75))
            ThreePointArc((-20.25, -18.75), (-21.475908947, -19.3856231993), (-21.6628630048, -20.7538036619))
            ThreePointArc((-21.6628630048, -20.7538036619), (-21.2132034356, -21.2132034356), (-20.7538036619, -21.6628630048))
            ThreePointArc((-20.7538036619, -21.6628630048), (-19.3856231993, -21.475908947), (-18.75, -20.25))
            Line((-18.75, -20.25), (-19.5, -20.25))
            ThreePointArc((-19.5, -20.25), (-20.7803300859, -20.7803300859), (-20.25, -19.5))
        make_face()
    extrude(amount=-F24_DEPTH)


with BuildPart() as f24d:
    # F23 (on face) → F24, piece 4 (new body, through all)
    with BuildSketch(Plane(origin=(0, 0, 0), x_dir=(1, 0, 0), z_dir=(0, 0, -1))):
        with BuildLine():
            Line((-20.25, 19.5), (-20.25, 18.75))
            ThreePointArc((-20.25, 18.75), (-19.1893398282, 19.1893398282), (-18.75, 20.25))
            Line((-18.75, 20.25), (-19.5, 20.25))
            ThreePointArc((-19.5, 20.25), (-19.7196699141, 19.7196699141), (-20.25, 19.5))
        make_face()
        with BuildLine():
            ThreePointArc((-21.6628630048, 20.7538036619), (-21.475908947, 19.3856231993), (-20.25, 18.75))
            Line((-20.25, 18.75), (-20.25, 19.5))
            ThreePointArc((-20.25, 19.5), (-20.7803300859, 20.7803300859), (-19.5, 20.25))
            Line((-19.5, 20.25), (-18.75, 20.25))
            ThreePointArc((-18.75, 20.25), (-19.3856231993, 21.475908947), (-20.7538036619, 21.6628630048))
            ThreePointArc((-20.7538036619, 21.6628630048), (-21.2132034356, 21.2132034356), (-21.6628630048, 20.7538036619))
        make_face()
    extrude(amount=-F24_DEPTH)


with BuildPart() as f28:
    # F27 (on Top) → F28 (new body)
    with BuildSketch(Plane.XY):
        with BuildLine():
            ThreePointArc((-55.5924693942, 26.5955824107), (-57.9356151447, 32.2524366602), (-63.5924693942, 34.5955824107))
            Line((-63.5924693942, 34.5955824107), (-77.0924693942, 34.5955824107))
            ThreePointArc((-77.0924693942, 34.5955824107), (-79.920896519, 33.4240095354), (-81.0924693942, 30.5955824107))
            Line((-81.0924693942, 30.5955824107), (-81.0924693942, -9.9044175893))
            ThreePointArc((-81.0924693942, -9.9044175893), (-78.7493236437, -15.5612718388), (-73.0924693942, -17.9044175893))
            Line((-73.0924693942, -17.9044175893), (-59.5924693942, -17.9044175893))
            ThreePointArc((-59.5924693942, -17.9044175893), (-56.7640422695, -16.7328447141), (-55.5924693942, -13.9044175893))
            Line((-55.5924693942, -13.9044175893), (-55.5924693942, 26.5955824107))
        make_face()
    extrude(amount=F28_DEPTH)

    # F29 (on face) → F30 (join)
    with BuildSketch(Plane.XY.offset(11)):
        with Locations((-69.5924693942, 23.0955824107)):
            Circle(F29_R)
    extrude(amount=F30_DEPTH)


solid = Compound([f5.part, f1_1.part, f3_1.part, f24.part, f24b.part, f24c.part, f24d.part, f28.part])
